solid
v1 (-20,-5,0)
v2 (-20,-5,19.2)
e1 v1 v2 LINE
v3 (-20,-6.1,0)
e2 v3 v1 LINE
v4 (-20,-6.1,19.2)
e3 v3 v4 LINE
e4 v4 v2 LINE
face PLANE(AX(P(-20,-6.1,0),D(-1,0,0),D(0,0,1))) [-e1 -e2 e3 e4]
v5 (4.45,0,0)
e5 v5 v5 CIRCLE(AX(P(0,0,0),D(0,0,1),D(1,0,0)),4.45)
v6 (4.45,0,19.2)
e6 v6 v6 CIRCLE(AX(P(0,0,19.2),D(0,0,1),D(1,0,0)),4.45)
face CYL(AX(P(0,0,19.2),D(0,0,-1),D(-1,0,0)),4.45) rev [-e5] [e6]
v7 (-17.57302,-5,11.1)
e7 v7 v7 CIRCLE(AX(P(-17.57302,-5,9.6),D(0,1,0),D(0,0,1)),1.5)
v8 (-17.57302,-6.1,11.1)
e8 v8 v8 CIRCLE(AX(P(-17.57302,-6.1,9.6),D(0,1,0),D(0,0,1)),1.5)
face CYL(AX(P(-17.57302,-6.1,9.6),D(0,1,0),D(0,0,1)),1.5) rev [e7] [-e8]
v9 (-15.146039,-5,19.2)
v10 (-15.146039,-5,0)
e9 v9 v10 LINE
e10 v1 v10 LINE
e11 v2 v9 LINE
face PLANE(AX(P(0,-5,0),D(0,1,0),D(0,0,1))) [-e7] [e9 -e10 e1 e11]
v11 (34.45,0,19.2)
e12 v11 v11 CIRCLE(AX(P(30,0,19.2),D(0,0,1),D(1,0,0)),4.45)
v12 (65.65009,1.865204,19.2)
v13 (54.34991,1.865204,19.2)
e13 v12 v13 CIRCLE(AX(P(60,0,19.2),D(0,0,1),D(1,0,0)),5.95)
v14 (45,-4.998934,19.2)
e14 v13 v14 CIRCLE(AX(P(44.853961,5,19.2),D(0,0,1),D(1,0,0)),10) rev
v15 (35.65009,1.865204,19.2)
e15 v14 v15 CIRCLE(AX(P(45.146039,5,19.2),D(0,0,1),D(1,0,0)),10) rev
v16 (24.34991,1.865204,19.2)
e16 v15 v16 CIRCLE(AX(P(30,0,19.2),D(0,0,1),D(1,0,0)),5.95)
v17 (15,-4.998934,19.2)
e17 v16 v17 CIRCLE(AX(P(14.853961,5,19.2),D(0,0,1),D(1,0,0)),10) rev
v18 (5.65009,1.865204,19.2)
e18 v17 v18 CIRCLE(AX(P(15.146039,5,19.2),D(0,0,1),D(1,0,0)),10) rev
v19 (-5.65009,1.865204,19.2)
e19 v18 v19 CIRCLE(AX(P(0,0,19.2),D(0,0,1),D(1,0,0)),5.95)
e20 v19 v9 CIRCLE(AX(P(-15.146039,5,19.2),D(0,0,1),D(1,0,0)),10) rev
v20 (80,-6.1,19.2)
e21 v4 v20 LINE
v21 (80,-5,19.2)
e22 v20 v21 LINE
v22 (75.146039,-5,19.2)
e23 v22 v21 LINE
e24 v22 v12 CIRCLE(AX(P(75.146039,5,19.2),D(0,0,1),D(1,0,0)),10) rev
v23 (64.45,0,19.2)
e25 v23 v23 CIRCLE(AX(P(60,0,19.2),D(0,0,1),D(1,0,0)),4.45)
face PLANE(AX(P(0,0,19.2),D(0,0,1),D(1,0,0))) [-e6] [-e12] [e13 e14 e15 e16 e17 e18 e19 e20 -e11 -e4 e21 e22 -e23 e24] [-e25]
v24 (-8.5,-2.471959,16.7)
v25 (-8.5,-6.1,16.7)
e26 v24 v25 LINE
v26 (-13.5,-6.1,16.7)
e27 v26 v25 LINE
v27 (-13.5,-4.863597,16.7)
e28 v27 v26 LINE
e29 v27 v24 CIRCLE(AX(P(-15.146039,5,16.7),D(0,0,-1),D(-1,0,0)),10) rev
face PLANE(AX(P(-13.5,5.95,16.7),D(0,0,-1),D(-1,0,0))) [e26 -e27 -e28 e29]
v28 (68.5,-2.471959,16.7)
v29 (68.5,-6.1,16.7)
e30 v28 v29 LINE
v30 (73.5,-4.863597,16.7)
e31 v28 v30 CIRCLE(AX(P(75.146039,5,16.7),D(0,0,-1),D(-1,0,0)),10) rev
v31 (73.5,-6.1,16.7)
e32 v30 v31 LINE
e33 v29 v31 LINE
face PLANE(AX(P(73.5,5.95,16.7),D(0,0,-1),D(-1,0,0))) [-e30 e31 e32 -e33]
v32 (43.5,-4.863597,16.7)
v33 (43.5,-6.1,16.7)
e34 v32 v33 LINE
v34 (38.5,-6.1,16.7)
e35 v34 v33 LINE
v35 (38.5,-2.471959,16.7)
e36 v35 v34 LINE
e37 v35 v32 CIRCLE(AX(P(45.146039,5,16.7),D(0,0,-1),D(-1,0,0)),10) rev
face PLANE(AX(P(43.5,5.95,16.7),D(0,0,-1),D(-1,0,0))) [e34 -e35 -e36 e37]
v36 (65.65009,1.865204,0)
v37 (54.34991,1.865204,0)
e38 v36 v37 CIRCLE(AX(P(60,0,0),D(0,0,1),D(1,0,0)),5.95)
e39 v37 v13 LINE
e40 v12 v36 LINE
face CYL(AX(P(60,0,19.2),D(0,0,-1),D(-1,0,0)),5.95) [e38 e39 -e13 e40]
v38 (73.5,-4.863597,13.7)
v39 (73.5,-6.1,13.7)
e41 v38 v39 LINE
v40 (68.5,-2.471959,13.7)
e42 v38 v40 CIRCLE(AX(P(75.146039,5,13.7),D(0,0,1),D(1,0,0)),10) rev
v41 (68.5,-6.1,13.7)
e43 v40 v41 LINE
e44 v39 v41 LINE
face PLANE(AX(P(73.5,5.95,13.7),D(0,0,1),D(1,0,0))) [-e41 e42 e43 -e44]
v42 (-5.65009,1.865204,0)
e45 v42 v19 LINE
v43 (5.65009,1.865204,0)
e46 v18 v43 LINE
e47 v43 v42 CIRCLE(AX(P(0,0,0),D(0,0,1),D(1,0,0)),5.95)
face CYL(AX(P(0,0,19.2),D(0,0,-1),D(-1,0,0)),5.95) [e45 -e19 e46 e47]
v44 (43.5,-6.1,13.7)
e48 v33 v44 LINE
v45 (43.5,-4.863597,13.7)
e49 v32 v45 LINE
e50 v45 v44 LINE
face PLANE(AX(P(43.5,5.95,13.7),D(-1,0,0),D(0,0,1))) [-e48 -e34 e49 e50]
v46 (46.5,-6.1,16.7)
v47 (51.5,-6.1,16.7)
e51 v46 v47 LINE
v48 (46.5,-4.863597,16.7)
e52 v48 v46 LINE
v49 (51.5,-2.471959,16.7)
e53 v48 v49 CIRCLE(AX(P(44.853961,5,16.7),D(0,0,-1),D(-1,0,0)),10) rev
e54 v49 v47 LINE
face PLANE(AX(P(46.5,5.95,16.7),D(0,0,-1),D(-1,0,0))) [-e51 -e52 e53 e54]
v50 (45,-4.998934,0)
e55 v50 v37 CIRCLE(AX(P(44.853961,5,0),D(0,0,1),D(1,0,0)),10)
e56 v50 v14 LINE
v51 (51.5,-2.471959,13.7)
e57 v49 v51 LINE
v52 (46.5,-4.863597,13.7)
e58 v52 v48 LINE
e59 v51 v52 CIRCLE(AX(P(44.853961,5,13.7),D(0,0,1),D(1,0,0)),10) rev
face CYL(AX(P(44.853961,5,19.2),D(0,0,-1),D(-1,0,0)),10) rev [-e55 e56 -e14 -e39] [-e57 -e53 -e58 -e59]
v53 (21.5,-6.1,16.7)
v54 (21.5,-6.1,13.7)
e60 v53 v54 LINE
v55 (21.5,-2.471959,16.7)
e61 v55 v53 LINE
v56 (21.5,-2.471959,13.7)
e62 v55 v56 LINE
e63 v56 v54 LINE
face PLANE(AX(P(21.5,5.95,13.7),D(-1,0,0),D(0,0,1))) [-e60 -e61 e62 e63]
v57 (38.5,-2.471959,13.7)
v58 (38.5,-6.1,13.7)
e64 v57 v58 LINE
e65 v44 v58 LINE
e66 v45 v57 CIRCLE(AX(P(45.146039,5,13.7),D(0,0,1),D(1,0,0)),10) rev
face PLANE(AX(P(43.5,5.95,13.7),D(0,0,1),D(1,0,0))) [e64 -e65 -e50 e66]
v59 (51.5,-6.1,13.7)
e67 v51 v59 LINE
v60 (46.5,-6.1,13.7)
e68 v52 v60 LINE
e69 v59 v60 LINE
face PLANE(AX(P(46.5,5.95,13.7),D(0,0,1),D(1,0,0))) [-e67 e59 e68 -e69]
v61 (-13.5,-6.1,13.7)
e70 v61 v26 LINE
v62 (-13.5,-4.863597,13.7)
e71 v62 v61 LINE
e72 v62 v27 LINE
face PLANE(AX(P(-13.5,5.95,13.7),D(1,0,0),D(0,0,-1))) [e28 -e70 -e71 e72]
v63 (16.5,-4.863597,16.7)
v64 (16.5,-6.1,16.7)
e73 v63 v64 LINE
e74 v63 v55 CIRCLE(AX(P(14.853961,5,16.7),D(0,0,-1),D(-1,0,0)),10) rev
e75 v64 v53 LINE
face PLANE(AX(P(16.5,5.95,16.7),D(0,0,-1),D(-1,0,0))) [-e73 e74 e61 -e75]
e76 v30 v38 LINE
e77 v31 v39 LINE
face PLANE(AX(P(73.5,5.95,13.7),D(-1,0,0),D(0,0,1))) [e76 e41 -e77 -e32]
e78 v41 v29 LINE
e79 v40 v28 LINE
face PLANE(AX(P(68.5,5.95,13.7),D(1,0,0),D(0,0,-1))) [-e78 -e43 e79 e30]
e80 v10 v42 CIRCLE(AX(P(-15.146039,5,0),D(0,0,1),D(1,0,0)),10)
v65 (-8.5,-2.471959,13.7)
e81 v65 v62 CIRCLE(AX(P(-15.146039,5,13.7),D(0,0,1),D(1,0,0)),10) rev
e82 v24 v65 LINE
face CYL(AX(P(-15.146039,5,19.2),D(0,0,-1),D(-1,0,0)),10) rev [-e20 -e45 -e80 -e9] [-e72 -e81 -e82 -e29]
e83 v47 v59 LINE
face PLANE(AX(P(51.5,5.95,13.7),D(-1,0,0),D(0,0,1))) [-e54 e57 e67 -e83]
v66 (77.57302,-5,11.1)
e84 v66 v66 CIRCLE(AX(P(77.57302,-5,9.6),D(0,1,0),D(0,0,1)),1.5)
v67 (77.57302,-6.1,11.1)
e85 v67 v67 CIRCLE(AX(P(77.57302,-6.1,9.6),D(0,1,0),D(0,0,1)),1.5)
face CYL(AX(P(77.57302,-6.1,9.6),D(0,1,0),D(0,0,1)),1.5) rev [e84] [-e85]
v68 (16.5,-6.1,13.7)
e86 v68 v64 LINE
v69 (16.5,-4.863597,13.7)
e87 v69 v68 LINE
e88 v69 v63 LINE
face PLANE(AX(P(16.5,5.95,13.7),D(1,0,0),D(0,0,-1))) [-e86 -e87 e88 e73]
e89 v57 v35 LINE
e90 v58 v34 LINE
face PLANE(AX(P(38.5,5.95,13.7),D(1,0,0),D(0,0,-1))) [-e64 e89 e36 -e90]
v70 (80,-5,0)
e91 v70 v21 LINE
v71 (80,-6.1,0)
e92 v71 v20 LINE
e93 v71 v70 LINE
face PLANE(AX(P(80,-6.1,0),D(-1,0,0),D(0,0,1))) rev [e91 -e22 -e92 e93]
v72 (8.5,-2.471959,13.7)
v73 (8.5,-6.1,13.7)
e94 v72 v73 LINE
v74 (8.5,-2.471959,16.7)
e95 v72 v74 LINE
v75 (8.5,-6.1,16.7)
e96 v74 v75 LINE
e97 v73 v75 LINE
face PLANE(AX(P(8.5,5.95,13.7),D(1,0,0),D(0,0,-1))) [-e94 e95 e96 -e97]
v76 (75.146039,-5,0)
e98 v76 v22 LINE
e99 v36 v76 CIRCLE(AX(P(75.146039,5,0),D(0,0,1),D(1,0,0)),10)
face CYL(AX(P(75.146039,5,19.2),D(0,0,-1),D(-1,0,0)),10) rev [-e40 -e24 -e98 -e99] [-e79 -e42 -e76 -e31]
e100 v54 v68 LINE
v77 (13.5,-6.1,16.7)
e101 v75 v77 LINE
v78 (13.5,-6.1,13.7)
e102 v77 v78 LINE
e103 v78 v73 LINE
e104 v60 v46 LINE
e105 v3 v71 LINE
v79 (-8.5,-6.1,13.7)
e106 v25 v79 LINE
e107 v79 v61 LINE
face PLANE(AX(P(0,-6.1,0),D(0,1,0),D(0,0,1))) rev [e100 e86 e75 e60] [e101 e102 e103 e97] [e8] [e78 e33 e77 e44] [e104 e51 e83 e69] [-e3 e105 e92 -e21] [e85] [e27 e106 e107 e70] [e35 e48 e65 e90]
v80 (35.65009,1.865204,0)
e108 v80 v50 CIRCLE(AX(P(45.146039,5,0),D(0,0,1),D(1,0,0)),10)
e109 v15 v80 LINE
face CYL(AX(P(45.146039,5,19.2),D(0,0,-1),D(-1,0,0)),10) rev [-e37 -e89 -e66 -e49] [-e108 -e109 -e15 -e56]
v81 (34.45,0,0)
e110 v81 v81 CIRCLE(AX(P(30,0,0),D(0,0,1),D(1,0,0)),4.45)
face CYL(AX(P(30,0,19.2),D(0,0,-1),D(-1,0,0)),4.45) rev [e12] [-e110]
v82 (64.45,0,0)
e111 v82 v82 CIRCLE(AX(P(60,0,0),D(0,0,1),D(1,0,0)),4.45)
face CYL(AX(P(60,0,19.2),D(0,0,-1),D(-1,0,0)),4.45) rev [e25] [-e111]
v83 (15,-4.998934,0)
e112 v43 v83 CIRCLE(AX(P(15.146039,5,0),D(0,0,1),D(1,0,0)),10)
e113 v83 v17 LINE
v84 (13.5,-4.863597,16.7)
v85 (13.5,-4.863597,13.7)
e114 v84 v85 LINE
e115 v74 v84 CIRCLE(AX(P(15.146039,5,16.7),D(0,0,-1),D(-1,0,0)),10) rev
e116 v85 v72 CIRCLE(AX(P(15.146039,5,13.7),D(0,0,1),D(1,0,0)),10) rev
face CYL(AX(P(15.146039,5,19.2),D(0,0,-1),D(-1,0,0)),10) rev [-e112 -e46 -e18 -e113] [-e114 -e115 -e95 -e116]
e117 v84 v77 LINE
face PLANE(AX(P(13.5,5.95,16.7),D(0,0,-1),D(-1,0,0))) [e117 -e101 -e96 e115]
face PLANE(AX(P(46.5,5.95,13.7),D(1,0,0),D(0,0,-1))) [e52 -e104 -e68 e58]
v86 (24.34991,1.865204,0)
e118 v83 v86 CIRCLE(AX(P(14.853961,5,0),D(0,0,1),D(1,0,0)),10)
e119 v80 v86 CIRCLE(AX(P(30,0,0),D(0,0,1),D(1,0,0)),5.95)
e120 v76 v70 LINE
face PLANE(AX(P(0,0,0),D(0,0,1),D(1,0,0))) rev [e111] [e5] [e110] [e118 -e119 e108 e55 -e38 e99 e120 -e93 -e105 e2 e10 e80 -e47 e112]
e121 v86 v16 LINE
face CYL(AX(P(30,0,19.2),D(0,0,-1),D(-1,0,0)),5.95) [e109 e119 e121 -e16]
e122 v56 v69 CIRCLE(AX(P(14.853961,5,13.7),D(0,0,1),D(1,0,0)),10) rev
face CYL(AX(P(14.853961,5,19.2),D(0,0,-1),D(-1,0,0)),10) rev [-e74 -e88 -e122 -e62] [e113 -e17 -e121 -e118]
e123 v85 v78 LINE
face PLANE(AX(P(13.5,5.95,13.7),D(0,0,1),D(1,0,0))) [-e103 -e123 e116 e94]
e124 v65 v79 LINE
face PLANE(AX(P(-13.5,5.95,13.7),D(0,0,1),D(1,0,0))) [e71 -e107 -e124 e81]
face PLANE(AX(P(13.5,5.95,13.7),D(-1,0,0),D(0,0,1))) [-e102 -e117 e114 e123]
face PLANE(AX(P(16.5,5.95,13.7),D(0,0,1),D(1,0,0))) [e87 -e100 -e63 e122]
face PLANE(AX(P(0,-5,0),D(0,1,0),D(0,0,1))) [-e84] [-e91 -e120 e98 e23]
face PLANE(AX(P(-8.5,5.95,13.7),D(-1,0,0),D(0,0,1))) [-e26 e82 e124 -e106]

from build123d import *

# Parameters (mm, degrees)
ESQUISSE1_R                  = 5.95
ESQUISSE1_R_2                = 4.45
EXTRU_MINCE1_DEPTH           = 19.2
EXTRU_MINCE1_2_DEPTH         = 19.2
EXTRU_MINCE1_3_DEPTH         = 19.2
ESQUISSE3_W                  = 20
ESQUISSE3_H                  = 19.2
ESQUISSE3_W_2                = 40
BOSS_EXTRU_1_DEPTH           = 1.1
CONG_1_R                     = 10
ENL_V_MAT_EXTRU_1_DEPTH      = 83.99724393
ENL_V_MAT_EXTRU_1_DEPTH_BACK = 83.99724393
ESQUISSE4_W                  = 5
ESQUISSE4_H                  = 3
ESQUISSE5_R                  = 1.5
ENL_V_MAT_EXTRU_4_DEPTH      = 83.99724393


with BuildPart() as part:
    # Esquisse1 → Extru.-Mince1 (new body)
    with BuildSketch(Plane.XY):
        Circle(ESQUISSE1_R)
        Circle(ESQUISSE1_R_2, mode=Mode.SUBTRACT)
    extrude(amount=EXTRU_MINCE1_DEPTH)



with BuildPart() as body_2:
    # Esquisse1 → Extru.-Mince1 2 (new body)
    with BuildSketch(Plane.XY):
        with Locations((30, 0)):
            Circle(ESQUISSE1_R)
        with Locations((30, 0)):
            Circle(ESQUISSE1_R_2, mode=Mode.SUBTRACT)
    extrude(amount=EXTRU_MINCE1_2_DEPTH)


with BuildPart() as body_3:
    # Esquisse1 → Extru.-Mince1 3 (new body)
    with BuildSketch(Plane.XY):
        with Locations((60, 0)):
            Circle(ESQUISSE1_R)
        with Locations((60, 0)):
            Circle(ESQUISSE1_R_2, mode=Mode.SUBTRACT)
    extrude(amount=EXTRU_MINCE1_3_DEPTH)


with BuildPart() as part_1:
    add(part.part)

    add(body_2.part)  # Boss.-Extru.1 merges body 2

    add(body_3.part)  # Boss.-Extru.1 merges body 3
    # Esquisse3 → Boss.-Extru.1 (add)
    with BuildSketch(Plane(origin=(0, -5, 0), x_dir=(1, 0, 0), z_dir=(0, 1, 0))):
        with Locations((-10, -9.6)):
            Rectangle(ESQUISSE3_W, ESQUISSE3_H)
        with Locations((10, -9.6)):
            Rectangle(ESQUISSE3_W, ESQUISSE3_H)
        with Locations((30, -9.6)):
            Rectangle(ESQUISSE3_W, ESQUISSE3_H)
        with Locations((60, -9.6)):
            Rectangle(ESQUISSE3_W_2, ESQUISSE3_H)
    extrude(amount=-BOSS_EXTRU_1_DEPTH)

    # Congé1
    # the kernel refuses this fillet: 10 mm, written as the material it adds along each edge
    with BuildSketch(Plane(origin=(-3.225290685, -5, 19.2), x_dir=(-0.33303824301553114, 0.9429133198174305, 0), z_dir=(0, 0, -1)), Plane(origin=(26.774709315, -5, 19.2), x_dir=(-0.33303824301553103, 0.9429133198174305, 0), z_dir=(0, 0, -1)), Plane(origin=(56.774709315, -5, 19.2), x_dir=(-0.3330382430155325, 0.9429133198174301, 0), z_dir=(0, 0, -1))) as cong_1_piece_1:
        with BuildLine():
            CenterArc((13.399198301, -7.90985002), CONG_1_R, 127.722343038, 71.730945551)
            Line((3.970065103, -11.24023245), (0, 0))
            ThreePointArc((0, 0), (3.640421456, -1.243639238), (7.280842913, 0))
        make_face()
    extrude(amount=19.2)
    with BuildSketch(Plane(origin=(3.225290685, -5, 19.2), x_dir=(0.33303824301553153, 0.9429133198174304, 0), z_dir=(0, 0, -1))) as cong_1_piece_2:
        with BuildLine():
            CenterArc((13.399198301, 7.90985002), CONG_1_R, 160.546711411, 71.730945551)
            Line((3.970065103, 11.24023245), (0, 0))
            ThreePointArc((0, 0), (3.640421456, 1.243639238), (7.280842913, 0))
        make_face()
    extrude(amount=19.2)
    with BuildSketch(Plane(origin=(33.225290685, -5, 19.2), x_dir=(1, 0, 0), z_dir=(0, 0, -1)), Plane(origin=(63.225290685, -5, 19.2), x_dir=(1, 0, 0), z_dir=(0, 0, -1))) as cong_1_piece_3:
        with BuildLine():
            CenterArc((11.920748402, -10), CONG_1_R, 90, 71.730945551)
            ThreePointArc((2.424799131, -6.865203762), (2.385043568, -3.018422454), (0, 0))
            Line((0, 0), (11.920748402, 0))
        make_face()
    extrude(amount=19.2)

    # Esquisse4 → Enlèv. mat.-Extru.1 (cut, two sides: drawn at the far end of the back side and taken through both)
    with BuildSketch(Plane(origin=(0, -5, 0), x_dir=(1, 0, 0), z_dir=(0, 1, 0)).offset(-ENL_V_MAT_EXTRU_1_DEPTH_BACK)):
        with Locations((-11, -15.2)):
            Rectangle(ESQUISSE4_W, ESQUISSE4_H)
        with Locations((11, -15.2)):
            Rectangle(ESQUISSE4_W, ESQUISSE4_H)
        with Locations((19, -15.2)):
            Rectangle(ESQUISSE4_W, ESQUISSE4_H)
        with Locations((41, -15.2)):
            Rectangle(ESQUISSE4_W, ESQUISSE4_H)
        with Locations((49, -15.2)):
            Rectangle(ESQUISSE4_W, ESQUISSE4_H)
        with Locations((71, -15.2)):
            Rectangle(ESQUISSE4_W, ESQUISSE4_H)
    extrude(amount=ENL_V_MAT_EXTRU_1_DEPTH + ENL_V_MAT_EXTRU_1_DEPTH_BACK, mode=Mode.SUBTRACT)

    # Esquisse5 → Enlèv. mat.-Extru.4 (cut, through all)
    with BuildSketch(Plane(origin=(0, -5, 0), x_dir=(1, 0, 0), z_dir=(0, 1, 0))):
        with BuildLine():
            ThreePointArc((79.073019543, -9.6), (78.494574401, -8.416472796), (77.205370686, -8.145753007))
            Line((77.205370686, -8.145753007), (77.940668401, -11.054246993))
            ThreePointArc((77.940668401, -11.054246993), (78.756546747, -10.521554858), (79.073019543, -9.6))
        make_face()
        with BuildLine():
            Line((77.940668401, -11.054246993), (77.205370686, -8.145753007))
            ThreePointArc((77.205370686, -8.145753007), (76.11877255, -9.967648858), (77.940668401, -11.054246993))
        make_face()
        with Locations(Location((-17.573019543, -9.6, 0), (0, 0, 270))):
            Circle(ESQUISSE5_R)
    extrude(amount=-ENL_V_MAT_EXTRU_4_DEPTH, mode=Mode.SUBTRACT)


solid = part_1.part
